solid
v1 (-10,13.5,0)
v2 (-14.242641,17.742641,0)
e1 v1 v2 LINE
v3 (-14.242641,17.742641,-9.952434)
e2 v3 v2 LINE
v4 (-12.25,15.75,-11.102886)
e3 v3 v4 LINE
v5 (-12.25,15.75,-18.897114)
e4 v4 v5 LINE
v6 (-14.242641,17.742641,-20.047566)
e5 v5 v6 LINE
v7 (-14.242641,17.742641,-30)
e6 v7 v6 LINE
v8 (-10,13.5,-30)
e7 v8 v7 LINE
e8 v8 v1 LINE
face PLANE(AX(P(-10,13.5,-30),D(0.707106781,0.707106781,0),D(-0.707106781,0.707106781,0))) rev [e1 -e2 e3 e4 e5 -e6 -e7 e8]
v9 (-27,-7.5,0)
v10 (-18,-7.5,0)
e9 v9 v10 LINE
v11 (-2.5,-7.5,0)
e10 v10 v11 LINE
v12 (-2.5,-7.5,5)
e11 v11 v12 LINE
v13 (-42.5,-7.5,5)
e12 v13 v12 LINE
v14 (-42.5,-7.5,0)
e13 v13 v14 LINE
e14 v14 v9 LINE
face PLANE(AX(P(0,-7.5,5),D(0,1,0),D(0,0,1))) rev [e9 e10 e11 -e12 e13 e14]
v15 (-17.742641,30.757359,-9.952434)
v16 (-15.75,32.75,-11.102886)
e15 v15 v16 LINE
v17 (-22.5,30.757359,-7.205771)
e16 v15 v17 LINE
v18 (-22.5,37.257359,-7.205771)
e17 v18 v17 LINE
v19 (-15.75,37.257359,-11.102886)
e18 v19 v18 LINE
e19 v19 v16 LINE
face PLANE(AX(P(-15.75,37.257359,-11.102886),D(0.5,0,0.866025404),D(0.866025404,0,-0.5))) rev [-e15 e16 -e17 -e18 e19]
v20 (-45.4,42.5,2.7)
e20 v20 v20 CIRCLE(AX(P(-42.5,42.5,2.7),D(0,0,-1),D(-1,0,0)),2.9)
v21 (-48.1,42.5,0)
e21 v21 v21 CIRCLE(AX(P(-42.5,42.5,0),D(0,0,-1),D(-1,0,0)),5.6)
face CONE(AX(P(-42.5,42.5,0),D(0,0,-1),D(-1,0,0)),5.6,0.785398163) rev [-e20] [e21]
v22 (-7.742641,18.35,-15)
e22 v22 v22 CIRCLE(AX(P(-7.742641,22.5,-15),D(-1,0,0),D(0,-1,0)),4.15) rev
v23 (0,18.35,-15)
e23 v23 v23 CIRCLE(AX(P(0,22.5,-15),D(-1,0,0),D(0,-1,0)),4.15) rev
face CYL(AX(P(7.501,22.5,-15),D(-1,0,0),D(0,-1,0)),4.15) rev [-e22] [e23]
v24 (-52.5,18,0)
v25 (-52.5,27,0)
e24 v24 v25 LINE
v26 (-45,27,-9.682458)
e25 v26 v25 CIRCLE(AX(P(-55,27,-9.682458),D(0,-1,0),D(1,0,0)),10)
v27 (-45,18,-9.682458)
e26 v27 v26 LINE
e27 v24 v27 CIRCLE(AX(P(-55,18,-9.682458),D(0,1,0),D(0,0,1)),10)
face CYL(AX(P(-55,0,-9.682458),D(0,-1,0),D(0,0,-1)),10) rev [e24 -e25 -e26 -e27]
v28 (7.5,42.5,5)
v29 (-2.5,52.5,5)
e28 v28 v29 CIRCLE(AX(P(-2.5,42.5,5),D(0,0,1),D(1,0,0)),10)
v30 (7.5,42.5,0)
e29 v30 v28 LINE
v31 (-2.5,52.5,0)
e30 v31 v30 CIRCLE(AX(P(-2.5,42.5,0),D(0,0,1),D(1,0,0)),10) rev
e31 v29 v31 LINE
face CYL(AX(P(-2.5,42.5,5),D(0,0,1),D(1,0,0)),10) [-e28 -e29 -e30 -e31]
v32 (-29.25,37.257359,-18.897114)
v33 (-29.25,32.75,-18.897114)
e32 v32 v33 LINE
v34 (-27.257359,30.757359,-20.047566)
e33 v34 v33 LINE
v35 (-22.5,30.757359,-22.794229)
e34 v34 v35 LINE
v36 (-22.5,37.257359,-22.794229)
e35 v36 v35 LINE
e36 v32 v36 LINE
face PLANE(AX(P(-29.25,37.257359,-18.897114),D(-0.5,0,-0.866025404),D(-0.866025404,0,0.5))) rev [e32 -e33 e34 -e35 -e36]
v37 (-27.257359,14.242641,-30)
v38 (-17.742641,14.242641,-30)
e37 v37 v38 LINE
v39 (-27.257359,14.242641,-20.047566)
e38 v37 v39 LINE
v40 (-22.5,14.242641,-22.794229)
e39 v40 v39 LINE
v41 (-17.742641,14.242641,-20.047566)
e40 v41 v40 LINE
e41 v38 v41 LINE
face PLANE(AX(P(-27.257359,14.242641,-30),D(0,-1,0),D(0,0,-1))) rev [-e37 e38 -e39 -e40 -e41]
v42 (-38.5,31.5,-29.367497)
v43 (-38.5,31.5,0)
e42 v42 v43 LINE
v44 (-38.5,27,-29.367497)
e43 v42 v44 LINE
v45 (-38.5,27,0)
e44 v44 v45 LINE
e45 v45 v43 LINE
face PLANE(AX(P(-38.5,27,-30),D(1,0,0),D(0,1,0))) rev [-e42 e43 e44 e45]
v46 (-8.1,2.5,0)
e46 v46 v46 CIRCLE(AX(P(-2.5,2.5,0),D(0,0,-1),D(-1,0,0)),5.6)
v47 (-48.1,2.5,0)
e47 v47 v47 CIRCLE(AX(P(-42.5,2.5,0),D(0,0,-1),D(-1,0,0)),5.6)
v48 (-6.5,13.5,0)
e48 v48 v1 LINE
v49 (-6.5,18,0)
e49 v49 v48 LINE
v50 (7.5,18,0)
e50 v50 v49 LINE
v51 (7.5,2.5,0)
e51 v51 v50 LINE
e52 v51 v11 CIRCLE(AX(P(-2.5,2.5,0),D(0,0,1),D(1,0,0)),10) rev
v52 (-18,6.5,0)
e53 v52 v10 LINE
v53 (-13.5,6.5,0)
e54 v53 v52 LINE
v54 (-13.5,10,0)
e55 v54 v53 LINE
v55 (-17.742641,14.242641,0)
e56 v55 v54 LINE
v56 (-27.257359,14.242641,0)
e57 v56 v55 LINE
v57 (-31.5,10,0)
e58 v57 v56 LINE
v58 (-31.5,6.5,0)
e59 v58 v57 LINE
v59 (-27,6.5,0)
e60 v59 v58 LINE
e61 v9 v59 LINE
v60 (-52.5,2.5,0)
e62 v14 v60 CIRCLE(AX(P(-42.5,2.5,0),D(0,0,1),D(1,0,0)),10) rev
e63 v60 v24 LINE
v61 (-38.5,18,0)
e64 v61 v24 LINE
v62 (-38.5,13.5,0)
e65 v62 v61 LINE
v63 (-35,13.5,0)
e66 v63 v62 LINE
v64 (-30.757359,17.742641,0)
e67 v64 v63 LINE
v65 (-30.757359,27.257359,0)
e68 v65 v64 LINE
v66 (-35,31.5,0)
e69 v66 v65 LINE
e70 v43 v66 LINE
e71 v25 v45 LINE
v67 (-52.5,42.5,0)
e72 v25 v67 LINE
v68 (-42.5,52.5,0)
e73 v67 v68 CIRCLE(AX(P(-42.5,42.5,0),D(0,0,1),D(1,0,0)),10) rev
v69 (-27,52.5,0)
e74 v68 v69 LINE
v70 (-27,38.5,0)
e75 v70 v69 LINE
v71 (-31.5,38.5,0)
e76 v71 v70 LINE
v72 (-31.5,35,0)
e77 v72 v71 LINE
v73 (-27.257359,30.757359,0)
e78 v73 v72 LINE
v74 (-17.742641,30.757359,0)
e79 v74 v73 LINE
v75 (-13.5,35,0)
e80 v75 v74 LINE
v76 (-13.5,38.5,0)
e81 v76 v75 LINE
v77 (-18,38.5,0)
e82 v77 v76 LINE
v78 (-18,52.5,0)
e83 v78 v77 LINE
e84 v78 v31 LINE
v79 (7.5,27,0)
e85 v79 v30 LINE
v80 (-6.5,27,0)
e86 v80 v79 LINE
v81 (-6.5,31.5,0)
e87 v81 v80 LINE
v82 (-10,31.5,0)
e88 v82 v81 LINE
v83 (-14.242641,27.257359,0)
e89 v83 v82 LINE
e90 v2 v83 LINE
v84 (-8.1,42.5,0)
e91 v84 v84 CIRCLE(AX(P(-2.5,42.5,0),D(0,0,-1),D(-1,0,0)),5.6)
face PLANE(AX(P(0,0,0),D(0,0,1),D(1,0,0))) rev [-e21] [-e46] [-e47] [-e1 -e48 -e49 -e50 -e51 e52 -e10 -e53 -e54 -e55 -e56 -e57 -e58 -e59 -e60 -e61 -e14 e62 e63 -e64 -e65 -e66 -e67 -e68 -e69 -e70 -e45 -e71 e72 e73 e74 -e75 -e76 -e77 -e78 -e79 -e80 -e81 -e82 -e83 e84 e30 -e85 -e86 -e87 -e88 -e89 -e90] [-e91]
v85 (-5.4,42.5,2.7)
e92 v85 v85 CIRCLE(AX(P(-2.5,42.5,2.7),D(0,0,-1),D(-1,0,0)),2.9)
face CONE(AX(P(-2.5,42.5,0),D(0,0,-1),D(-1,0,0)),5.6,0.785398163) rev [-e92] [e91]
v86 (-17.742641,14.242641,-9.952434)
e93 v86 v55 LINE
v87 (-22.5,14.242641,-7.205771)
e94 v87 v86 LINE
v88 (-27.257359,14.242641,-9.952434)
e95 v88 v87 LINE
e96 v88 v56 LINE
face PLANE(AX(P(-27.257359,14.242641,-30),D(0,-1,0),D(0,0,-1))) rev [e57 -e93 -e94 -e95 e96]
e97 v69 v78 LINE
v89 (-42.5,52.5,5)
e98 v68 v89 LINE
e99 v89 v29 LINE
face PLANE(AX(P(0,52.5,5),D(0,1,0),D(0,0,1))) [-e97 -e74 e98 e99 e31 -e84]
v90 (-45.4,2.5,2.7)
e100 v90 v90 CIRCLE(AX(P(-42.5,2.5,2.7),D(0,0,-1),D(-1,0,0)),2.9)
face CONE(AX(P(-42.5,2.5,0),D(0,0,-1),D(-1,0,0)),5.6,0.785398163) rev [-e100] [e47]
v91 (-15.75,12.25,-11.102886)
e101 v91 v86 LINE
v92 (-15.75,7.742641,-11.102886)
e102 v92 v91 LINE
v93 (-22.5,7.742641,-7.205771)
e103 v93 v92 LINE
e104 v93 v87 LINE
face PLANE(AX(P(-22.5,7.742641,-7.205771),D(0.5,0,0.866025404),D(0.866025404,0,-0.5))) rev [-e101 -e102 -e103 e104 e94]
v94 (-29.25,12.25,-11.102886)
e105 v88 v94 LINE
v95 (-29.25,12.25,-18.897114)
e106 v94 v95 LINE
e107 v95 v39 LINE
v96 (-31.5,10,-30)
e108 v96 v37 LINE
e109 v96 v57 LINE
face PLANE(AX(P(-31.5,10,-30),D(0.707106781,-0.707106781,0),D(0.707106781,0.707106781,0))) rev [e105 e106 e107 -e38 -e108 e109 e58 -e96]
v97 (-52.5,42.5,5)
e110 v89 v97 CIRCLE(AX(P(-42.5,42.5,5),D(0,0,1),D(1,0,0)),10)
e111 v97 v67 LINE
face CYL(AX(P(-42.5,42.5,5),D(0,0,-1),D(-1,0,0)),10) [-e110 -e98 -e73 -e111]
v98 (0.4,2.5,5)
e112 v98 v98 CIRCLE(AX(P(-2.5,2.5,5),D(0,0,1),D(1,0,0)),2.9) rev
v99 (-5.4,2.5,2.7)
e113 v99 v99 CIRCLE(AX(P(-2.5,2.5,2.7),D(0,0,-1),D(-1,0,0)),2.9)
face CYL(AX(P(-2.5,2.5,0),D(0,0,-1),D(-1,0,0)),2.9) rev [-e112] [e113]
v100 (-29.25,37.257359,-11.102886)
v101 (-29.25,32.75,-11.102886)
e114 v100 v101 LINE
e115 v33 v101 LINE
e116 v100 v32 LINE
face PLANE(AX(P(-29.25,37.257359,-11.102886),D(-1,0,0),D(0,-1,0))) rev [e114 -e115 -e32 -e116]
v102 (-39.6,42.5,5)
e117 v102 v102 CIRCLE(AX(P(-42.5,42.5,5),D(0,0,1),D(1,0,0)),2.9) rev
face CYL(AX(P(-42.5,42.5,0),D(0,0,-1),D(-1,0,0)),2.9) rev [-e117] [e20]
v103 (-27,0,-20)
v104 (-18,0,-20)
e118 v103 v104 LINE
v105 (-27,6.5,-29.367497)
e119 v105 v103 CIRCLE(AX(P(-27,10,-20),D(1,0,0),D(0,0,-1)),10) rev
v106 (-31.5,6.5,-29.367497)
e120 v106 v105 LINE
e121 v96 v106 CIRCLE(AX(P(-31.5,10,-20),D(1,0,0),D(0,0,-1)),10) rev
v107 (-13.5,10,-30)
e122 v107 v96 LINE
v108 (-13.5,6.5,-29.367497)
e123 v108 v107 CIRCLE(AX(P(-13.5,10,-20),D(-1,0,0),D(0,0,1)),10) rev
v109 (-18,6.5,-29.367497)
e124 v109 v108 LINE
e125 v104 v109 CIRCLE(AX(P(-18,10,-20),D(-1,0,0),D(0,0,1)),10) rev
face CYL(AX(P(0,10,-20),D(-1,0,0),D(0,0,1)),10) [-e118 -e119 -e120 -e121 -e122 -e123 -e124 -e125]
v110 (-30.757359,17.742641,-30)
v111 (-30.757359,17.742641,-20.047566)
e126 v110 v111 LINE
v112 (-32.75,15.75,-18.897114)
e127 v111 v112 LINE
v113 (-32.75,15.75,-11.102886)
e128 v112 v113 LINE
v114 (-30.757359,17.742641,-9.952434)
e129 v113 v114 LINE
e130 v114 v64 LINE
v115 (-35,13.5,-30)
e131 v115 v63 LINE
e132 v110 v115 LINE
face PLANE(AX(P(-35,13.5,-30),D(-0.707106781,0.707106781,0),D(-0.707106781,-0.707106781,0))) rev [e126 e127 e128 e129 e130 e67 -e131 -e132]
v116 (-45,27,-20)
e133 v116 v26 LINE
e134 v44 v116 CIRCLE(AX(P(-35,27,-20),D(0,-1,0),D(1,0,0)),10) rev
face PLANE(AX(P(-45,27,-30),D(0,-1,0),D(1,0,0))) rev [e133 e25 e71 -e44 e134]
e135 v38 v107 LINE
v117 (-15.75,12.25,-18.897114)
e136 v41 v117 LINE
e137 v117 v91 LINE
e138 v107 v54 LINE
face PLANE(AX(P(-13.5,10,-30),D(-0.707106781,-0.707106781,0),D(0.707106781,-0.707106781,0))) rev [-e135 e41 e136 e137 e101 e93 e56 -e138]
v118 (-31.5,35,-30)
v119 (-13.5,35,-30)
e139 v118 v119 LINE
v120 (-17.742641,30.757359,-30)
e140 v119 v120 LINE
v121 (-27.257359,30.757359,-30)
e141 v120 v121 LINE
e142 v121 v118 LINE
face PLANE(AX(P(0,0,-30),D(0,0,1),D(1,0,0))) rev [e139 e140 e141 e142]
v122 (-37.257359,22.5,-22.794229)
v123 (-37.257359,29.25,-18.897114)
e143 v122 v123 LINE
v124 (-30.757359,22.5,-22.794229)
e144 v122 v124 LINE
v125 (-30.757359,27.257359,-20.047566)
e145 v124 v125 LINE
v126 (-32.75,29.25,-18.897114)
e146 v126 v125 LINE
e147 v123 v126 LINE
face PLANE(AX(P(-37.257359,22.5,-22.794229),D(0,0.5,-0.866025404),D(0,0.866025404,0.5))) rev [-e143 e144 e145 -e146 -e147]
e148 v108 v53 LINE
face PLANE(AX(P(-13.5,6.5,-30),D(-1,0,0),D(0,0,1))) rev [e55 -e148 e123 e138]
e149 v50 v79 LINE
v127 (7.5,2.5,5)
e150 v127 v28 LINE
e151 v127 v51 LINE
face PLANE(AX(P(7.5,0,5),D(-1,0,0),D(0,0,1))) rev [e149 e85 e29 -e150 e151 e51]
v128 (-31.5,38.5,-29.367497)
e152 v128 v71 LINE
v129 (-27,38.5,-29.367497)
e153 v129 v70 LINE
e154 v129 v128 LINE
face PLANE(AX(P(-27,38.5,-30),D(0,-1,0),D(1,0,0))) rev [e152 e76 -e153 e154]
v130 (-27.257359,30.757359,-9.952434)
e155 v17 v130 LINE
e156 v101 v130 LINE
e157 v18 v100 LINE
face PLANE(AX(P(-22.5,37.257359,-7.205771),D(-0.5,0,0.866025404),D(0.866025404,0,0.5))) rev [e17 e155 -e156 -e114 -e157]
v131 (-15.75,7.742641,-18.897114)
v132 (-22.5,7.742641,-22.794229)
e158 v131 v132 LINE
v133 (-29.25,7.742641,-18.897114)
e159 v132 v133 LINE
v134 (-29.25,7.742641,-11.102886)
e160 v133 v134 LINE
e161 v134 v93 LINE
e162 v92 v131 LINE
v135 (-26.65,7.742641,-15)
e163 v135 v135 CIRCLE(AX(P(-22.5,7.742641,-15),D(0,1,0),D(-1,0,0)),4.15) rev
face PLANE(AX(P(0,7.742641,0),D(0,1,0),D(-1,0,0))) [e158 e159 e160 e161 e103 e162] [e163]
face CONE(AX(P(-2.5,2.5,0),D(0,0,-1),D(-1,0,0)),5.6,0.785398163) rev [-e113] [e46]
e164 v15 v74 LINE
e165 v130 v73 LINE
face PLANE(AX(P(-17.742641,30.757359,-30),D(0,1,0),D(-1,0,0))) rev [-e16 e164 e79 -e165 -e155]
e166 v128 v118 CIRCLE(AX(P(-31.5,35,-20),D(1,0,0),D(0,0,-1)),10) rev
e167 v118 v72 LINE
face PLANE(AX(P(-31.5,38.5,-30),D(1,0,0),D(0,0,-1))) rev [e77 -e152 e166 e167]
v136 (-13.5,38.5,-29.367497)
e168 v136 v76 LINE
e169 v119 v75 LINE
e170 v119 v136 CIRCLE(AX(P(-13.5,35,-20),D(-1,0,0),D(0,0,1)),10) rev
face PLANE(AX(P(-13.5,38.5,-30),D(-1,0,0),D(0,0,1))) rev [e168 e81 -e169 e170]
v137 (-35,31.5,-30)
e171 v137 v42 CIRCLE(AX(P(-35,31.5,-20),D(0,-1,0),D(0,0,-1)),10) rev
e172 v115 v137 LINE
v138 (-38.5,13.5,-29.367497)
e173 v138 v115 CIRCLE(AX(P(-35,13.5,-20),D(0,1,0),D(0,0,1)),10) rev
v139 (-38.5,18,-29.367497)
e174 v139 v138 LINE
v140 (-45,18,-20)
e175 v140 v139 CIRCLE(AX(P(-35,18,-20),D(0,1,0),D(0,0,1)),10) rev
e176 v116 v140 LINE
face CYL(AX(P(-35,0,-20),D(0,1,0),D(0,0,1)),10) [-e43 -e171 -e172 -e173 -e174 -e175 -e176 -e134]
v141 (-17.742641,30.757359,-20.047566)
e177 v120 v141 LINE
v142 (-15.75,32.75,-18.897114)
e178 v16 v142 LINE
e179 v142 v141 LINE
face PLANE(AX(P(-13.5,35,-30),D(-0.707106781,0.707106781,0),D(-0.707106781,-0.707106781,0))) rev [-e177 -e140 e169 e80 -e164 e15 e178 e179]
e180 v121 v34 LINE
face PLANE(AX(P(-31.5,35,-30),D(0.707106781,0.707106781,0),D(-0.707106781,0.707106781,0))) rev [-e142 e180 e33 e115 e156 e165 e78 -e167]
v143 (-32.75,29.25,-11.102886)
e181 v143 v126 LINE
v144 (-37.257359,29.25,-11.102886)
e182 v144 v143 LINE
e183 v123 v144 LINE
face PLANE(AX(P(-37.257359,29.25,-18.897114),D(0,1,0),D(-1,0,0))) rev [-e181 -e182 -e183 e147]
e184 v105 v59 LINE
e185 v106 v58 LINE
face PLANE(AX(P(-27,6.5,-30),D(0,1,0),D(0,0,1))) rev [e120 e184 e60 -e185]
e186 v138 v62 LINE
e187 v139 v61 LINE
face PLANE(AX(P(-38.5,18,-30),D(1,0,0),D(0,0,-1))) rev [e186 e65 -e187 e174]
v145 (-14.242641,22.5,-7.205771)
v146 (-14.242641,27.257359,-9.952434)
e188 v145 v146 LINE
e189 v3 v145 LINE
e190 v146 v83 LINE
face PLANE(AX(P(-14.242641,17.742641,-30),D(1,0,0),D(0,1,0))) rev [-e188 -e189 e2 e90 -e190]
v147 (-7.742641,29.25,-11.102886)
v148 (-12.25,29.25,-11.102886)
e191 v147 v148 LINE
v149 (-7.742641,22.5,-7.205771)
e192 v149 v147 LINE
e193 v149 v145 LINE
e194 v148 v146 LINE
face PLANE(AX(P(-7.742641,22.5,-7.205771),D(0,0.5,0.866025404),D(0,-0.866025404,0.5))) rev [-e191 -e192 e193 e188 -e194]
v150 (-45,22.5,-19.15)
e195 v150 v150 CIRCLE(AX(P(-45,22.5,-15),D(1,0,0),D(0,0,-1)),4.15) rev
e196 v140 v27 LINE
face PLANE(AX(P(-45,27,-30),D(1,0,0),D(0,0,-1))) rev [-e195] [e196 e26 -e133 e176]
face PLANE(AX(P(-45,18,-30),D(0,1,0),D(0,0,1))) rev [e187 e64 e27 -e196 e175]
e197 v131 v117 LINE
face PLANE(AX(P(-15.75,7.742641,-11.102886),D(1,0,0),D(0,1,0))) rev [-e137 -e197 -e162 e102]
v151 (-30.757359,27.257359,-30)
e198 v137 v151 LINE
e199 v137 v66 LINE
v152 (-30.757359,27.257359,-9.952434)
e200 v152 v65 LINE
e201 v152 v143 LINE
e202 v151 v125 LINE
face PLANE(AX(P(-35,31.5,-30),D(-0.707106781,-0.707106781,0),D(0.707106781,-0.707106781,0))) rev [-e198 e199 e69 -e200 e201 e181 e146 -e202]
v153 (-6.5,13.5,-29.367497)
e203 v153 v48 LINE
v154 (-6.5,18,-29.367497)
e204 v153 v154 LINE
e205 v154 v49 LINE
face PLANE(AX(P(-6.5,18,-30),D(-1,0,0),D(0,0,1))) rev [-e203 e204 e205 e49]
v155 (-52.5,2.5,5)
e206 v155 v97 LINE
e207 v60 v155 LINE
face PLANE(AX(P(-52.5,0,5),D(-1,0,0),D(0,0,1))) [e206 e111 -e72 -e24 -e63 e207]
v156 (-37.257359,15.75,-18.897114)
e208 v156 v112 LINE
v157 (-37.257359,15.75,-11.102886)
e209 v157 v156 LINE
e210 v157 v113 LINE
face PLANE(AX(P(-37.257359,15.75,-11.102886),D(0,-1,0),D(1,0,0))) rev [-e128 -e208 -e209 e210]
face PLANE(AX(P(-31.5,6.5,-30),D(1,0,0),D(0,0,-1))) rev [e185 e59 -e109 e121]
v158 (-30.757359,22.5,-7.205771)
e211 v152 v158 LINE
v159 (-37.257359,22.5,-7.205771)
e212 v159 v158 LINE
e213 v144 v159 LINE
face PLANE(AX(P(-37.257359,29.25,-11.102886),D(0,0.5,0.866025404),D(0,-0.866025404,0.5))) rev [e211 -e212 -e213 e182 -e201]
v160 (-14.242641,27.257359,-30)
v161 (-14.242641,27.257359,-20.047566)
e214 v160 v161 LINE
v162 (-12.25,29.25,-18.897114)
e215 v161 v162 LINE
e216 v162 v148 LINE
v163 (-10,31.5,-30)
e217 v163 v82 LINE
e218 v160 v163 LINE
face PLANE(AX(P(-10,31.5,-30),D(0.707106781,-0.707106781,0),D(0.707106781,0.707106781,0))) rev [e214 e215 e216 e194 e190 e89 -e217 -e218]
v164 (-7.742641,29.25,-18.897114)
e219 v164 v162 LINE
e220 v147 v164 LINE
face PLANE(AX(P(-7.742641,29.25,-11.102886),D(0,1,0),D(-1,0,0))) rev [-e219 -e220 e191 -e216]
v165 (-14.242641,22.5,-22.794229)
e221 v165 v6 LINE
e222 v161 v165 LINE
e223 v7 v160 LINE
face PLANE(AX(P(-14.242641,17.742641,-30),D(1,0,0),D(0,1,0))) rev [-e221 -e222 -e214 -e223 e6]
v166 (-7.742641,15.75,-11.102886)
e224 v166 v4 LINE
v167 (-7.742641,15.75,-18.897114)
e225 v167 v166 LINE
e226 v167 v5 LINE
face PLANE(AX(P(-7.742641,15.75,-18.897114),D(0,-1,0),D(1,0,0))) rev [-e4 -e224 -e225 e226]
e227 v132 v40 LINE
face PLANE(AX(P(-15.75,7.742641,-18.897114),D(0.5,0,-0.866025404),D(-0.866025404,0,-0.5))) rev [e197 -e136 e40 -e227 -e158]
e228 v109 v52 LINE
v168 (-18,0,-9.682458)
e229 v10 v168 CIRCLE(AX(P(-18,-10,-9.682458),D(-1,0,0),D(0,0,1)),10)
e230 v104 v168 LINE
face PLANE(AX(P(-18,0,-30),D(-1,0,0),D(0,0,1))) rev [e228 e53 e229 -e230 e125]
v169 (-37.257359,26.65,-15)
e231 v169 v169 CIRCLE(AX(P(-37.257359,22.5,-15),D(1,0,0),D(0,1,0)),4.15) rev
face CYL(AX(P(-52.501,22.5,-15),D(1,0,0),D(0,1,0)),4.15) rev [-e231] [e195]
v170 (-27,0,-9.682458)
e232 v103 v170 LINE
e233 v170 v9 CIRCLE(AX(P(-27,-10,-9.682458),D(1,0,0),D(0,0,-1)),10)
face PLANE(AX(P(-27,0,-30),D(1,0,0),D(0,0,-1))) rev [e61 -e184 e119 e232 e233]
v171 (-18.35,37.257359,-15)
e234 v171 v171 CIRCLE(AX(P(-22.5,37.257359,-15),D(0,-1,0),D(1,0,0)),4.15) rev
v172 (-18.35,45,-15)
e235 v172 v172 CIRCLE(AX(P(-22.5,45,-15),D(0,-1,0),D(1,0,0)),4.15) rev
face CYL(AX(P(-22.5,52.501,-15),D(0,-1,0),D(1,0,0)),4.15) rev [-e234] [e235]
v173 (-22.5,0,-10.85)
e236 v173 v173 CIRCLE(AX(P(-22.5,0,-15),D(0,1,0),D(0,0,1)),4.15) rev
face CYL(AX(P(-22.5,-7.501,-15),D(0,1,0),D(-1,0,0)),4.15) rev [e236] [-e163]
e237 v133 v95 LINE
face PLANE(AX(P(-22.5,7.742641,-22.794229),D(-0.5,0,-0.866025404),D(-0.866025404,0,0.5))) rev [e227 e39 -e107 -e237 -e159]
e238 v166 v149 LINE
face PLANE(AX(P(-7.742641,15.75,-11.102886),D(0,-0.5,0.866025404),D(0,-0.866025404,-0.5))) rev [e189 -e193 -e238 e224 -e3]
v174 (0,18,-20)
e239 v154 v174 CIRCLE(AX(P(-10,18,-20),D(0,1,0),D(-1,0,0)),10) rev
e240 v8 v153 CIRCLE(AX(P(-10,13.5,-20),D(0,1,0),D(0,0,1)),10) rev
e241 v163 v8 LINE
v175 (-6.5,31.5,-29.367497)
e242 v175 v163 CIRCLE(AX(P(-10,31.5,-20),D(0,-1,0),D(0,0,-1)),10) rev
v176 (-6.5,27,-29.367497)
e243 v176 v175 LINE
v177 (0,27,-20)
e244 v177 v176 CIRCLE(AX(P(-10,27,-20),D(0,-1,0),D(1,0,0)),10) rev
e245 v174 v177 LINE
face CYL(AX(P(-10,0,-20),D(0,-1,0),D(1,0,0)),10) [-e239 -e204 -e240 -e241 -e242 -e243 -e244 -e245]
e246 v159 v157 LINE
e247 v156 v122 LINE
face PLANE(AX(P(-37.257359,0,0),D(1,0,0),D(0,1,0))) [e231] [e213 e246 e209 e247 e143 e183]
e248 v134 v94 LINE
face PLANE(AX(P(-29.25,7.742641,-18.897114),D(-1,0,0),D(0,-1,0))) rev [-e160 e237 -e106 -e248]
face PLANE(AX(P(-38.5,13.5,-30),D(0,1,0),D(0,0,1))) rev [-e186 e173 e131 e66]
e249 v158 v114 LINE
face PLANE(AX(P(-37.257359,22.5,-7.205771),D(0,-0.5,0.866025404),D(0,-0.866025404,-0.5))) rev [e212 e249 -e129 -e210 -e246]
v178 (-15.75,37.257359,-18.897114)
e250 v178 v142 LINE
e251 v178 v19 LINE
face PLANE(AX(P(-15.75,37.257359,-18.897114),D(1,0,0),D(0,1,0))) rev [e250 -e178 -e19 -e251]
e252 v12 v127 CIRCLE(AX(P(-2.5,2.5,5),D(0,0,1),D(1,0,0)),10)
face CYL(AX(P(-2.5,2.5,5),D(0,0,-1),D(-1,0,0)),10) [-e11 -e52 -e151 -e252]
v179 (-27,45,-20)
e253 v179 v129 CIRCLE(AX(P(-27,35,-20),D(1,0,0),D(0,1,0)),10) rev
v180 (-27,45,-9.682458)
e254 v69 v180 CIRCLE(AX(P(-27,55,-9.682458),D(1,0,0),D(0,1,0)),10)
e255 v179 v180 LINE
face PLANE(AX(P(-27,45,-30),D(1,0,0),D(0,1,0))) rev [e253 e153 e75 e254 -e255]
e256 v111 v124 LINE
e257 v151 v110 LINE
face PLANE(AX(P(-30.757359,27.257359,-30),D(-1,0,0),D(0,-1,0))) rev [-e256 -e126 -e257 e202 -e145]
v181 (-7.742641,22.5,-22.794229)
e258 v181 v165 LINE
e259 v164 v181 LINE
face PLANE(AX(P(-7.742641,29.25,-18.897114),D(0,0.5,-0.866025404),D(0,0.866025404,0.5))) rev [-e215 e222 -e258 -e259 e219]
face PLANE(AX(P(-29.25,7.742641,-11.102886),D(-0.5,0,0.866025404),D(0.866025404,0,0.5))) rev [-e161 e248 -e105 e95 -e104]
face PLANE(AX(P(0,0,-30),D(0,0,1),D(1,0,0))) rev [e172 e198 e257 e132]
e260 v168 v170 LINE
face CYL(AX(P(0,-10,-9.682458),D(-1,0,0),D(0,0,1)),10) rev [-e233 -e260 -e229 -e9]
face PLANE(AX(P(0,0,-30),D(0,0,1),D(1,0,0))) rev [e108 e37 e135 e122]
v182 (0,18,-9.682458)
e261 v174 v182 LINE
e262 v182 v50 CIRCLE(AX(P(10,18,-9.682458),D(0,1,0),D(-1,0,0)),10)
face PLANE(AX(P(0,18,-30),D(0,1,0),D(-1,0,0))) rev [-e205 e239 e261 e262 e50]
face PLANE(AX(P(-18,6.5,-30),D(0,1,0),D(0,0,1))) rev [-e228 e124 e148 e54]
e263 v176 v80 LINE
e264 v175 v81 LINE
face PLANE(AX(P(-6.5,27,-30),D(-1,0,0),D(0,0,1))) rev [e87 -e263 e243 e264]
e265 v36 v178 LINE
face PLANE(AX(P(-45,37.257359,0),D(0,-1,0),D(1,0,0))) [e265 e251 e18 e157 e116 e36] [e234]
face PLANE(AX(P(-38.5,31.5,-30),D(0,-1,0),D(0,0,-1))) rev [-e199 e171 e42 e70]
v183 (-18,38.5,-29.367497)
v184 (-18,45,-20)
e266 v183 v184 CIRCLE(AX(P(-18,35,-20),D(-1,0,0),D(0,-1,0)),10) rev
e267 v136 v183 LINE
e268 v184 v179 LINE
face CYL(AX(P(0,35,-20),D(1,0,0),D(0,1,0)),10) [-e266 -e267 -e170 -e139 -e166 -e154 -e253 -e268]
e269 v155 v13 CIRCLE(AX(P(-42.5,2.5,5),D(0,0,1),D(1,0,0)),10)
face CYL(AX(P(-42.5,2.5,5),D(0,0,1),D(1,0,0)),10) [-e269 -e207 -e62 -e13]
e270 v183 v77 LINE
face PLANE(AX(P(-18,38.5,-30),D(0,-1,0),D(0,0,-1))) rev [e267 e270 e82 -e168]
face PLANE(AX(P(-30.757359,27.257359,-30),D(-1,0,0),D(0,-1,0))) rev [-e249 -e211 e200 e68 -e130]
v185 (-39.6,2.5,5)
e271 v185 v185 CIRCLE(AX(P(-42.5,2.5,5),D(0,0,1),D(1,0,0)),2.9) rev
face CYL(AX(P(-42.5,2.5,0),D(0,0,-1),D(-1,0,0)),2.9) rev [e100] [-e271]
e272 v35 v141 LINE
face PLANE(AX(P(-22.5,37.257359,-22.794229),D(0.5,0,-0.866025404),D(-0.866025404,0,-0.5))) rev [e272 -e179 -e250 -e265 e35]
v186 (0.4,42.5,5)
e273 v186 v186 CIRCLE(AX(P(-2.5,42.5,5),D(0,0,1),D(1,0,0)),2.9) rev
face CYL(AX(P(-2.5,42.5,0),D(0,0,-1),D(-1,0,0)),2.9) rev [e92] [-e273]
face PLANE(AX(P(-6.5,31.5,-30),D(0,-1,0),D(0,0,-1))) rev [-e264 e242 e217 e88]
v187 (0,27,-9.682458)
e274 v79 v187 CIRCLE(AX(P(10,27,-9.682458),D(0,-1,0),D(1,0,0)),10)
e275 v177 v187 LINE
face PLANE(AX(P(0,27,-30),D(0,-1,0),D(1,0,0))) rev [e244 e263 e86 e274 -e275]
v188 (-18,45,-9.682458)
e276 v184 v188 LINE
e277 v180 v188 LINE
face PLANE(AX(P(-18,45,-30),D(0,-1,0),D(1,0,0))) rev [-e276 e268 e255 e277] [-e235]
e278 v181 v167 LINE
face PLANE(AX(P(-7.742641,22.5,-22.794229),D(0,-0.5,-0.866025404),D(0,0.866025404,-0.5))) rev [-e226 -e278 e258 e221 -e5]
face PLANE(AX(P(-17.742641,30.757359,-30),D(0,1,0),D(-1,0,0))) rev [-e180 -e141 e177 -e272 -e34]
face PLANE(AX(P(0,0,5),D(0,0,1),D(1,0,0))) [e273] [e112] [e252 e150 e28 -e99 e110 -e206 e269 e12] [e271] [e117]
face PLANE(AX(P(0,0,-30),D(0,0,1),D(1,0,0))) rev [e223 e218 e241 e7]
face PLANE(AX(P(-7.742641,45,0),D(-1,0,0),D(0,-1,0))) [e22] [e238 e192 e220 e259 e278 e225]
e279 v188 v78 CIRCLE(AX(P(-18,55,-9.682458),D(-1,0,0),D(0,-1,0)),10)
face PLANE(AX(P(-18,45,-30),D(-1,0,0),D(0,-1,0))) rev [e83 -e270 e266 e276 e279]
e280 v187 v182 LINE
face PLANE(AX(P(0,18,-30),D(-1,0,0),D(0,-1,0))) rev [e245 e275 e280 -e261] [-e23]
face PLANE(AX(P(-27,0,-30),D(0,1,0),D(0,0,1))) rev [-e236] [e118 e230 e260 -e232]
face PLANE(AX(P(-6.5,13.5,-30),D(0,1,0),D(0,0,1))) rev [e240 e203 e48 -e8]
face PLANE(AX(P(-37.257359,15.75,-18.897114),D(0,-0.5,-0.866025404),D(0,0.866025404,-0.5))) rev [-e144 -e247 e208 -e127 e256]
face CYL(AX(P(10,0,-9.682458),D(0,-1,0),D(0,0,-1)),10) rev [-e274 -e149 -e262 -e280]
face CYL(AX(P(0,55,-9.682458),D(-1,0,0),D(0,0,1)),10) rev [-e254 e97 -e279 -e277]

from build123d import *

# Parameters (mm, degrees)
SKETCH1_W                                            = 60
SKETCH1_H                                            = 60
BOSS_EXTRUDE1_DEPTH                                  = 5
CSK_FOR_M5_HEX_SOCKET_COUNTERSUNK_CAP_SC_D           = 5.8
CSK_FOR_M5_HEX_SOCKET_COUNTERSUNK_CAP_SC_DEPTH       = 5
CSK_FOR_M5_HEX_SOCKET_COUNTERSUNK_CAP_SC_CSINK_D     = 11.2
CSK_FOR_M5_HEX_SOCKET_COUNTERSUNK_CAP_SC_CSINK_ANGLE = 90
CSK_FOR_M5_HEX_SOCKET_COUNTERSUNK_CAP_SC_TIP         = 1.742495795
BOSS_EXTRUDE2_DEPTH                                  = 30
FILLET1_R                                            = 10
CUT_EXTRUDE1_REACH                                   = 73.553
SKETCH11_R                                           = 4.15
CIRPATTERN1_COUNT                                    = 4
FILLET2_R                                            = 10
CUT_EXTRUDE2_DEPTH                                   = 6.5
CIRPATTERN2_COUNT                                    = 4


with BuildPart() as part:
    # Sketch1 → Boss-Extrude1 (new body)
    with BuildSketch(Plane.XY):
        with Locations((-22.5, 22.5)):
            Rectangle(SKETCH1_W, SKETCH1_H)
    extrude(amount=BOSS_EXTRUDE1_DEPTH)

    # CSK for M5 Hex Socket Countersunk Cap Screw1
    with Locations(Plane(origin=(0, 0, 0), x_dir=(-1, 0, 0), z_dir=(0, 0, -1))):
        with Locations((2.5, 42.5), (42.5, 42.5), (42.5, 2.5), (2.5, 2.5)):
            CounterSinkHole(CSK_FOR_M5_HEX_SOCKET_COUNTERSUNK_CAP_SC_D / 2, CSK_FOR_M5_HEX_SOCKET_COUNTERSUNK_CAP_SC_CSINK_D / 2, depth=CSK_FOR_M5_HEX_SOCKET_COUNTERSUNK_CAP_SC_DEPTH, counter_sink_angle=CSK_FOR_M5_HEX_SOCKET_COUNTERSUNK_CAP_SC_CSINK_ANGLE)
            with Locations((0, 0, -(CSK_FOR_M5_HEX_SOCKET_COUNTERSUNK_CAP_SC_DEPTH + CSK_FOR_M5_HEX_SOCKET_COUNTERSUNK_CAP_SC_TIP / 2))):  # 118° drill point
                Cone(0, CSK_FOR_M5_HEX_SOCKET_COUNTERSUNK_CAP_SC_D / 2, CSK_FOR_M5_HEX_SOCKET_COUNTERSUNK_CAP_SC_TIP, mode=Mode.SUBTRACT)

    # Sketch8 → Boss-Extrude2 (add)
    with BuildSketch(Plane(origin=(0, 0, 0), x_dir=(-1, 0, 0), z_dir=(0, 0, -1))):
        Polygon((27, 0), (27, 6.5), (31.5, 6.5), (31.5, 10), (27.257359313, 14.242640687), (17.742640687, 14.242640687), (13.5, 10), (13.5, 6.5), (18, 6.5), (18, 0), align=None)
        Polygon((0, 18), (6.5, 18), (6.5, 13.5), (10, 13.5), (14.242640687, 17.742640687), (14.242640687, 27.257359313), (10, 31.5), (6.5, 31.5), (6.5, 27), (0, 27), align=None)
        Polygon((18, 45), (18, 38.5), (13.5, 38.5), (13.5, 35), (17.742640687, 30.757359313), (27.257359313, 30.757359313), (31.5, 35), (31.5, 38.5), (27, 38.5), (27, 45), align=None)
        Polygon((45, 27), (38.5, 27), (38.5, 31.5), (35, 31.5), (30.757359313, 27.257359313), (30.757359313, 17.742640687), (35, 13.5), (38.5, 13.5), (38.5, 18), (45, 18), align=None)
    extrude(amount=BOSS_EXTRUDE2_DEPTH)

    # Fillet1
    # the kernel refuses this fillet: 10 mm, written as the material it adds along each edge
    with BuildSketch(Plane(origin=(-27, 45, 0), x_dir=(0, 1, 0), z_dir=(1, 0, 0)), Plane(origin=(-45, 18, 0), x_dir=(-1, 0, 0), z_dir=(0, 1, 0)), Plane(origin=(0, 27, 0), x_dir=(1, 0, 0), z_dir=(0, -1, 0)), Plane(origin=(-18, 0, 0), x_dir=(0, -1, 0), z_dir=(-1, 0, 0))) as fillet1_piece_1:
        with BuildLine():
            CenterArc((10, -9.682458366), FILLET1_R, 104.477512186, 75.522487814)
            Line((0, -9.682458366), (0, 0))
            Line((0, 0), (7.5, 0))
        make_face()
    extrude(amount=9)
    # the kernel refuses this fillet: 10 mm, written as the material it takes off along each edge
    with BuildSketch(Plane(origin=(-52, 45, -30), x_dir=(0, -1, 0), z_dir=(1, 0, 0)), Plane(origin=(7, 0, -30), x_dir=(0, 1, 0), z_dir=(-1, 0, 0))) as fillet1_2_piece_1:
        with BuildLine():
            CenterArc((FILLET1_R, -FILLET1_R), FILLET1_R, 90, 90)
            Line((0, -FILLET1_R), (0, 0))
            Line((0, 0), (FILLET1_R, 0))
        make_face()
    extrude(amount=59, mode=Mode.SUBTRACT)
    with BuildSketch(Plane(origin=(-45, -7, -30), x_dir=(0, 0, 1), z_dir=(0, 1, 0)), Plane(origin=(0, 52, -30), x_dir=(0, 0, 1), z_dir=(0, -1, 0))) as fillet1_2_piece_2:
        with BuildLine():
            CenterArc((FILLET1_R, FILLET1_R), FILLET1_R, 180, 90)
            Line((0, FILLET1_R), (0, 0))
            Line((0, 0), (FILLET1_R, 0))
        make_face()
    extrude(amount=59, mode=Mode.SUBTRACT)

    # Sketch11 → Cut-Extrude1 (cut, up to next)
    with BuildSketch(Plane(origin=(0, 14.242640687, 0), x_dir=(1, 0, 0), z_dir=(0, 1, 0)), mode=Mode.PRIVATE) as cut_extrude1_sk1:
        with Locations(Location((-22.5, 15, 0), (0, 0, 180))):
            Circle(SKETCH11_R)
    cut_extrude1_tool1 = extrude(cut_extrude1_sk1.sketch, amount=-CUT_EXTRUDE1_REACH, mode=Mode.PRIVATE) & part.part
    cut_extrude1 = cut_extrude1_tool1.solids().sort_by_distance((-22.5, 14.242641, -15))[0]
    add(cut_extrude1, mode=Mode.SUBTRACT)

    # CirPattern1: Cut-Extrude1 ×4 about axis
    cirpattern1_axis = Axis((-22.5, 22.5, 0), (0, 0, -1))
    for i in range(1, CIRPATTERN1_COUNT):
        add(cut_extrude1.rotate(cirpattern1_axis, i * 360 / CIRPATTERN1_COUNT), mode=Mode.SUBTRACT)

    # Fillet2
    fillet2_edges = [part.edges().sort_by_distance(p)[0] for p in [
        (7.5, 52.5, 2.5),
        (7.5, -7.5, 2.5),
        (-52.5, -7.5, 2.5),
        (-52.5, 52.5, 2.5),
    ]]
    fillet(fillet2_edges, radius=FILLET2_R)

    # Sketch12 → Cut-Extrude2 (cut)
    with BuildSketch(Plane(origin=(-30.757359313, 0, 0), x_dir=(0, 0, -1), z_dir=(1, 0, 0))):
        Polygon((11.102885683, 15.75), (18.897114317, 15.75), (22.794228634, 22.5), (18.897114317, 29.25), (11.102885683, 29.25), (7.205771366, 22.5), align=None)
    cut_extrude2 = extrude(amount=-CUT_EXTRUDE2_DEPTH, mode=Mode.SUBTRACT)

    # CirPattern2: Cut-Extrude2 ×4 about axis
    cirpattern2_axis = Axis((-22.5, 22.5, 0), (0, 0, 1))
    for i in range(1, CIRPATTERN2_COUNT):
        add(cut_extrude2.rotate(cirpattern2_axis, i * 360 / CIRPATTERN2_COUNT), mode=Mode.SUBTRACT)


solid = part.part
